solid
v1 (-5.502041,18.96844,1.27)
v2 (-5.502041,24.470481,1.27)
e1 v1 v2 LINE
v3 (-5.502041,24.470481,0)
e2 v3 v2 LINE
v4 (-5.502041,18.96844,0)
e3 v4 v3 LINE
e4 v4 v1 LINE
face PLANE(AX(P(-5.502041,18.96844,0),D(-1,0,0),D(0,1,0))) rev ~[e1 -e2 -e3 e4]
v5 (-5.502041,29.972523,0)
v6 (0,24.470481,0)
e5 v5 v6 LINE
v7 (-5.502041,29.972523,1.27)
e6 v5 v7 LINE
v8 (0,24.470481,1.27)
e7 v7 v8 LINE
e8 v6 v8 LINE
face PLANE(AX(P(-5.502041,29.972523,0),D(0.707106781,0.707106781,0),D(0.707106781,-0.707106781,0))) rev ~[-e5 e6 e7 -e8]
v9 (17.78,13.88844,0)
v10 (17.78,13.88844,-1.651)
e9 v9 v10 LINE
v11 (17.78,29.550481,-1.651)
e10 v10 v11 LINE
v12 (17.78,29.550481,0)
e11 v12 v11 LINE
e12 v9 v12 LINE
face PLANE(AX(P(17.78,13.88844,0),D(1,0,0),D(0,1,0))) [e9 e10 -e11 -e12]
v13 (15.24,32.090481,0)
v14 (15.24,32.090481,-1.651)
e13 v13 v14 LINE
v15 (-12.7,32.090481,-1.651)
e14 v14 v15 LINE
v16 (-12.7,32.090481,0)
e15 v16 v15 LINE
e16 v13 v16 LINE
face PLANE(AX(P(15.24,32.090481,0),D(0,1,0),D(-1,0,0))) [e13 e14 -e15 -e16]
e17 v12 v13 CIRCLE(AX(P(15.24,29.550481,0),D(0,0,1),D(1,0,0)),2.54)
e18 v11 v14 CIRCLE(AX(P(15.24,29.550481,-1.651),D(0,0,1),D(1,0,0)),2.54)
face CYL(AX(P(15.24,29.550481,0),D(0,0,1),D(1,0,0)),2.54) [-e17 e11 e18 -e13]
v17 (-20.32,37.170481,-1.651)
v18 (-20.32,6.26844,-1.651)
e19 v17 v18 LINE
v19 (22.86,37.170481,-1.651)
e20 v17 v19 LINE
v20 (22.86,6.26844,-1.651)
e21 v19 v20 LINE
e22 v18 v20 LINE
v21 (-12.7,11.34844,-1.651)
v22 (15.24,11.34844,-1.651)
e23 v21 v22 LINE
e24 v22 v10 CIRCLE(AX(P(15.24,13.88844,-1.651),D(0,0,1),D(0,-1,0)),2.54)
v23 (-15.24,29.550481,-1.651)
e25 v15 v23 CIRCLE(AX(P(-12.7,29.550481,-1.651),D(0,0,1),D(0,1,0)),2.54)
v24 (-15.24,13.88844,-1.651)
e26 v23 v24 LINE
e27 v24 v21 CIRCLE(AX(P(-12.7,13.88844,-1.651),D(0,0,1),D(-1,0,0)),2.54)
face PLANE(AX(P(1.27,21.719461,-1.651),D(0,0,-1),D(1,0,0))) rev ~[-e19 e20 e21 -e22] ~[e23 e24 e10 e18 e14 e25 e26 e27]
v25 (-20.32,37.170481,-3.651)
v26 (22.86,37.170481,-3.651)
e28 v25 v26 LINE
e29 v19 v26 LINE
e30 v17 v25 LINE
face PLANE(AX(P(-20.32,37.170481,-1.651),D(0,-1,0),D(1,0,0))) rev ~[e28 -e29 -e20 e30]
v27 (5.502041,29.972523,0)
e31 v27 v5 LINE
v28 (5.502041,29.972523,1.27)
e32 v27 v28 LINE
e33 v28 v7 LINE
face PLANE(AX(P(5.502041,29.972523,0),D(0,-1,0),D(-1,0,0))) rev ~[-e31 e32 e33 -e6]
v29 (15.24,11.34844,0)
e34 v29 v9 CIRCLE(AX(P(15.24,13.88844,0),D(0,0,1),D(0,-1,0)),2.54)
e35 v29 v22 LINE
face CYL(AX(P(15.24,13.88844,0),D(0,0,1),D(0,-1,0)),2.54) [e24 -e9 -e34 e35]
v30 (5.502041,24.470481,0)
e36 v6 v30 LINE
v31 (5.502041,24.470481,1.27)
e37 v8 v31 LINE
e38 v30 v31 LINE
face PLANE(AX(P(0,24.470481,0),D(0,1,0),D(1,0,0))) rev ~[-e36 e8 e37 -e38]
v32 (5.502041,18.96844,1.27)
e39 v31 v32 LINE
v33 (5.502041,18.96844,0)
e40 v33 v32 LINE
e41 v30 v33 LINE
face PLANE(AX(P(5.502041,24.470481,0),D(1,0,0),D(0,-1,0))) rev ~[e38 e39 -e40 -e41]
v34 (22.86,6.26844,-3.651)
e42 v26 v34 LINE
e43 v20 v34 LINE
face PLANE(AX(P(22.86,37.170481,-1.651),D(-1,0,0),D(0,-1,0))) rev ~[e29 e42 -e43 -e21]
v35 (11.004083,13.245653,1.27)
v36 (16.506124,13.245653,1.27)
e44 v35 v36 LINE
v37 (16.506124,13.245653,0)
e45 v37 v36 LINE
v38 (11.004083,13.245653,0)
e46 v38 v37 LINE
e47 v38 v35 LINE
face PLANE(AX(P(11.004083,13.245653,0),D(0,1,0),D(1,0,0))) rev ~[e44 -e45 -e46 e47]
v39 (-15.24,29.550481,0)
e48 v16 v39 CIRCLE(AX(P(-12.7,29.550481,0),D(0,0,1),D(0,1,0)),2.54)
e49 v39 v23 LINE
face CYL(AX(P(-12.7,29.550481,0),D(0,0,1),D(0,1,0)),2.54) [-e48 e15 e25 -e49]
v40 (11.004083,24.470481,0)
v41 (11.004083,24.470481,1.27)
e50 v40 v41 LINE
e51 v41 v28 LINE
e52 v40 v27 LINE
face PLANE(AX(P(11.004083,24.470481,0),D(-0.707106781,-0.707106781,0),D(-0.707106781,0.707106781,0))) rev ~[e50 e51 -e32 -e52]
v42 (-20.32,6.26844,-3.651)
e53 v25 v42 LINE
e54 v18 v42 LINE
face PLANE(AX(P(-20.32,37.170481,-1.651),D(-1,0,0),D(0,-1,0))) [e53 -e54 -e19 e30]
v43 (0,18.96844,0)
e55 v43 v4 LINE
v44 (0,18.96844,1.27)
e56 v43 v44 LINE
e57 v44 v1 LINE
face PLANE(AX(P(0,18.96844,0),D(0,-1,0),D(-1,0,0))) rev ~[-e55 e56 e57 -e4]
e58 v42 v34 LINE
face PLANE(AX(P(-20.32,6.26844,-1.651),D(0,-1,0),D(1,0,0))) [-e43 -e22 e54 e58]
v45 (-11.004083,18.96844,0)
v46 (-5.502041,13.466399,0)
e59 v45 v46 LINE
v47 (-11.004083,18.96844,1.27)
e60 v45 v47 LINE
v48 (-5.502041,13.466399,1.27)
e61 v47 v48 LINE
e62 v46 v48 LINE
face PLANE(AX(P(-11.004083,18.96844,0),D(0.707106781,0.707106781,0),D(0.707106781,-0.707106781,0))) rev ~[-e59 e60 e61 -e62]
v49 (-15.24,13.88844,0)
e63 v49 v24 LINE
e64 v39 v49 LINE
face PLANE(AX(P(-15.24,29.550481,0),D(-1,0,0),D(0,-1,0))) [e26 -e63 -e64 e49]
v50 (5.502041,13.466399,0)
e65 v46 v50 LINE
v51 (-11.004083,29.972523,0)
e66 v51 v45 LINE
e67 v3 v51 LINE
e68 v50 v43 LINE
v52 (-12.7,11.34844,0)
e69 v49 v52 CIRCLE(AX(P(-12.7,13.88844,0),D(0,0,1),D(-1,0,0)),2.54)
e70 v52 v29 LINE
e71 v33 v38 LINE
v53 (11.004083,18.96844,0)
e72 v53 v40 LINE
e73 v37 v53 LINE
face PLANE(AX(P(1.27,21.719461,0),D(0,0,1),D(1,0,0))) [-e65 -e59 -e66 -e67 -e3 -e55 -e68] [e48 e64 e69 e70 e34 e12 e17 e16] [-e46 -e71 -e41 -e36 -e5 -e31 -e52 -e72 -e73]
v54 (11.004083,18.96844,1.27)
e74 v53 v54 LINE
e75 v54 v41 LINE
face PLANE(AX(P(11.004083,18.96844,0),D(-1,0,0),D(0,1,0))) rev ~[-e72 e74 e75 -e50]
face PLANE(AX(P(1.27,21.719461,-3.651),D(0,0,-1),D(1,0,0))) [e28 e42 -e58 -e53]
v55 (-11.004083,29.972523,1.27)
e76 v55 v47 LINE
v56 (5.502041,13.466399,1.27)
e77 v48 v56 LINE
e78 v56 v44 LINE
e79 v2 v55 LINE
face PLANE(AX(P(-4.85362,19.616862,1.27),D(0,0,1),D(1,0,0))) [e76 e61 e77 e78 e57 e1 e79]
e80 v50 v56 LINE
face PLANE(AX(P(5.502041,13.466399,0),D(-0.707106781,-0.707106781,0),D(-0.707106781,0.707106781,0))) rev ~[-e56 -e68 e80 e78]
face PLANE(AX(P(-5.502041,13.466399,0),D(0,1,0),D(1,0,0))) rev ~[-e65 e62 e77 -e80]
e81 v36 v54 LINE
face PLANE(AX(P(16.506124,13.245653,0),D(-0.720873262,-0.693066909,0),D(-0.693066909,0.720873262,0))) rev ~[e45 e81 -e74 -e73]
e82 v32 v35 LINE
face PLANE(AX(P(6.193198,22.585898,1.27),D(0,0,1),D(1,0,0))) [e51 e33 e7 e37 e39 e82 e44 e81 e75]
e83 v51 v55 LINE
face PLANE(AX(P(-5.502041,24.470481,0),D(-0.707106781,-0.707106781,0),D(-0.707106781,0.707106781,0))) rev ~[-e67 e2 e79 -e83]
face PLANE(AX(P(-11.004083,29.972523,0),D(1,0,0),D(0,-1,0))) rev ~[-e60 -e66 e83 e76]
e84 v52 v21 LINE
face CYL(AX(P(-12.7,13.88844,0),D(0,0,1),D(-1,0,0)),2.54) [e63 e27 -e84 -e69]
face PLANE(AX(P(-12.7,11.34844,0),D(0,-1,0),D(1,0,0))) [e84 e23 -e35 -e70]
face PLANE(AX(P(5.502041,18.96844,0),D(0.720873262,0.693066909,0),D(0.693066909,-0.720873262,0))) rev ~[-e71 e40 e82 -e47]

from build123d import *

# Parameters (mm, degrees)
F3_DEPTH = 1.651
F4_DEPTH = 1.27
F5_W     = 43.18
F5_H     = 30.902041302
F6_DEPTH = 2


with BuildPart() as f3:
    # F2 (on face) → F3 (new body)
    with BuildSketch(Plane.XY):
        with BuildLine():
            Line((15.24, 32.0904812722), (-12.7, 32.0904812722))
            ThreePointArc((-12.7, 32.0904812722), (-14.4960512242, 31.3465324964), (-15.24, 29.5504812722))
            Line((-15.24, 29.5504812722), (-15.24, 13.8884399702))
            ThreePointArc((-15.24, 13.8884399702), (-14.4960512242, 12.092388746), (-12.7, 11.3484399702))
            Line((-12.7, 11.3484399702), (15.24, 11.3484399702))
            ThreePointArc((15.24, 11.3484399702), (17.0360512242, 12.092388746), (17.78, 13.8884399702))
            Line((17.78, 13.8884399702), (17.78, 29.5504812722))
            ThreePointArc((17.78, 29.5504812722), (17.0360512242, 31.3465324964), (15.24, 32.0904812722))
        make_face()
    extrude(amount=-F3_DEPTH)

    # F1 (on face) → F4 (join)
    with BuildSketch(Plane.XY):
        Polygon((-5.502041302, 24.4704812722), (-11.0040826039, 29.9725225741), (-11.0040826039, 18.9684399702), (-5.502041302, 13.4663986682), (5.502041302, 13.4663986682), (0, 18.9684399702), (-5.502041302, 18.9684399702), align=None)
        Polygon((5.502041302, 29.9725225741), (-5.502041302, 29.9725225741), (0, 24.4704812722), (5.502041302, 24.4704812722), (5.502041302, 18.9684399702), (11.0040826039, 13.245652739), (16.5061239059, 13.245652739), (11.0040826039, 18.9684399702), (11.0040826039, 24.4704812722), align=None)
    extrude(amount=F4_DEPTH)

    # F5 (on face) → F6 (join)
    with BuildSketch(Plane(origin=(0, 0, -1.651), x_dir=(1, 0, 0), z_dir=(0, 0, -1))):
        with Locations((1.27, -21.7194606212)):
            Rectangle(F5_W, F5_H)
    extrude(amount=F6_DEPTH)


solid = f3.part
